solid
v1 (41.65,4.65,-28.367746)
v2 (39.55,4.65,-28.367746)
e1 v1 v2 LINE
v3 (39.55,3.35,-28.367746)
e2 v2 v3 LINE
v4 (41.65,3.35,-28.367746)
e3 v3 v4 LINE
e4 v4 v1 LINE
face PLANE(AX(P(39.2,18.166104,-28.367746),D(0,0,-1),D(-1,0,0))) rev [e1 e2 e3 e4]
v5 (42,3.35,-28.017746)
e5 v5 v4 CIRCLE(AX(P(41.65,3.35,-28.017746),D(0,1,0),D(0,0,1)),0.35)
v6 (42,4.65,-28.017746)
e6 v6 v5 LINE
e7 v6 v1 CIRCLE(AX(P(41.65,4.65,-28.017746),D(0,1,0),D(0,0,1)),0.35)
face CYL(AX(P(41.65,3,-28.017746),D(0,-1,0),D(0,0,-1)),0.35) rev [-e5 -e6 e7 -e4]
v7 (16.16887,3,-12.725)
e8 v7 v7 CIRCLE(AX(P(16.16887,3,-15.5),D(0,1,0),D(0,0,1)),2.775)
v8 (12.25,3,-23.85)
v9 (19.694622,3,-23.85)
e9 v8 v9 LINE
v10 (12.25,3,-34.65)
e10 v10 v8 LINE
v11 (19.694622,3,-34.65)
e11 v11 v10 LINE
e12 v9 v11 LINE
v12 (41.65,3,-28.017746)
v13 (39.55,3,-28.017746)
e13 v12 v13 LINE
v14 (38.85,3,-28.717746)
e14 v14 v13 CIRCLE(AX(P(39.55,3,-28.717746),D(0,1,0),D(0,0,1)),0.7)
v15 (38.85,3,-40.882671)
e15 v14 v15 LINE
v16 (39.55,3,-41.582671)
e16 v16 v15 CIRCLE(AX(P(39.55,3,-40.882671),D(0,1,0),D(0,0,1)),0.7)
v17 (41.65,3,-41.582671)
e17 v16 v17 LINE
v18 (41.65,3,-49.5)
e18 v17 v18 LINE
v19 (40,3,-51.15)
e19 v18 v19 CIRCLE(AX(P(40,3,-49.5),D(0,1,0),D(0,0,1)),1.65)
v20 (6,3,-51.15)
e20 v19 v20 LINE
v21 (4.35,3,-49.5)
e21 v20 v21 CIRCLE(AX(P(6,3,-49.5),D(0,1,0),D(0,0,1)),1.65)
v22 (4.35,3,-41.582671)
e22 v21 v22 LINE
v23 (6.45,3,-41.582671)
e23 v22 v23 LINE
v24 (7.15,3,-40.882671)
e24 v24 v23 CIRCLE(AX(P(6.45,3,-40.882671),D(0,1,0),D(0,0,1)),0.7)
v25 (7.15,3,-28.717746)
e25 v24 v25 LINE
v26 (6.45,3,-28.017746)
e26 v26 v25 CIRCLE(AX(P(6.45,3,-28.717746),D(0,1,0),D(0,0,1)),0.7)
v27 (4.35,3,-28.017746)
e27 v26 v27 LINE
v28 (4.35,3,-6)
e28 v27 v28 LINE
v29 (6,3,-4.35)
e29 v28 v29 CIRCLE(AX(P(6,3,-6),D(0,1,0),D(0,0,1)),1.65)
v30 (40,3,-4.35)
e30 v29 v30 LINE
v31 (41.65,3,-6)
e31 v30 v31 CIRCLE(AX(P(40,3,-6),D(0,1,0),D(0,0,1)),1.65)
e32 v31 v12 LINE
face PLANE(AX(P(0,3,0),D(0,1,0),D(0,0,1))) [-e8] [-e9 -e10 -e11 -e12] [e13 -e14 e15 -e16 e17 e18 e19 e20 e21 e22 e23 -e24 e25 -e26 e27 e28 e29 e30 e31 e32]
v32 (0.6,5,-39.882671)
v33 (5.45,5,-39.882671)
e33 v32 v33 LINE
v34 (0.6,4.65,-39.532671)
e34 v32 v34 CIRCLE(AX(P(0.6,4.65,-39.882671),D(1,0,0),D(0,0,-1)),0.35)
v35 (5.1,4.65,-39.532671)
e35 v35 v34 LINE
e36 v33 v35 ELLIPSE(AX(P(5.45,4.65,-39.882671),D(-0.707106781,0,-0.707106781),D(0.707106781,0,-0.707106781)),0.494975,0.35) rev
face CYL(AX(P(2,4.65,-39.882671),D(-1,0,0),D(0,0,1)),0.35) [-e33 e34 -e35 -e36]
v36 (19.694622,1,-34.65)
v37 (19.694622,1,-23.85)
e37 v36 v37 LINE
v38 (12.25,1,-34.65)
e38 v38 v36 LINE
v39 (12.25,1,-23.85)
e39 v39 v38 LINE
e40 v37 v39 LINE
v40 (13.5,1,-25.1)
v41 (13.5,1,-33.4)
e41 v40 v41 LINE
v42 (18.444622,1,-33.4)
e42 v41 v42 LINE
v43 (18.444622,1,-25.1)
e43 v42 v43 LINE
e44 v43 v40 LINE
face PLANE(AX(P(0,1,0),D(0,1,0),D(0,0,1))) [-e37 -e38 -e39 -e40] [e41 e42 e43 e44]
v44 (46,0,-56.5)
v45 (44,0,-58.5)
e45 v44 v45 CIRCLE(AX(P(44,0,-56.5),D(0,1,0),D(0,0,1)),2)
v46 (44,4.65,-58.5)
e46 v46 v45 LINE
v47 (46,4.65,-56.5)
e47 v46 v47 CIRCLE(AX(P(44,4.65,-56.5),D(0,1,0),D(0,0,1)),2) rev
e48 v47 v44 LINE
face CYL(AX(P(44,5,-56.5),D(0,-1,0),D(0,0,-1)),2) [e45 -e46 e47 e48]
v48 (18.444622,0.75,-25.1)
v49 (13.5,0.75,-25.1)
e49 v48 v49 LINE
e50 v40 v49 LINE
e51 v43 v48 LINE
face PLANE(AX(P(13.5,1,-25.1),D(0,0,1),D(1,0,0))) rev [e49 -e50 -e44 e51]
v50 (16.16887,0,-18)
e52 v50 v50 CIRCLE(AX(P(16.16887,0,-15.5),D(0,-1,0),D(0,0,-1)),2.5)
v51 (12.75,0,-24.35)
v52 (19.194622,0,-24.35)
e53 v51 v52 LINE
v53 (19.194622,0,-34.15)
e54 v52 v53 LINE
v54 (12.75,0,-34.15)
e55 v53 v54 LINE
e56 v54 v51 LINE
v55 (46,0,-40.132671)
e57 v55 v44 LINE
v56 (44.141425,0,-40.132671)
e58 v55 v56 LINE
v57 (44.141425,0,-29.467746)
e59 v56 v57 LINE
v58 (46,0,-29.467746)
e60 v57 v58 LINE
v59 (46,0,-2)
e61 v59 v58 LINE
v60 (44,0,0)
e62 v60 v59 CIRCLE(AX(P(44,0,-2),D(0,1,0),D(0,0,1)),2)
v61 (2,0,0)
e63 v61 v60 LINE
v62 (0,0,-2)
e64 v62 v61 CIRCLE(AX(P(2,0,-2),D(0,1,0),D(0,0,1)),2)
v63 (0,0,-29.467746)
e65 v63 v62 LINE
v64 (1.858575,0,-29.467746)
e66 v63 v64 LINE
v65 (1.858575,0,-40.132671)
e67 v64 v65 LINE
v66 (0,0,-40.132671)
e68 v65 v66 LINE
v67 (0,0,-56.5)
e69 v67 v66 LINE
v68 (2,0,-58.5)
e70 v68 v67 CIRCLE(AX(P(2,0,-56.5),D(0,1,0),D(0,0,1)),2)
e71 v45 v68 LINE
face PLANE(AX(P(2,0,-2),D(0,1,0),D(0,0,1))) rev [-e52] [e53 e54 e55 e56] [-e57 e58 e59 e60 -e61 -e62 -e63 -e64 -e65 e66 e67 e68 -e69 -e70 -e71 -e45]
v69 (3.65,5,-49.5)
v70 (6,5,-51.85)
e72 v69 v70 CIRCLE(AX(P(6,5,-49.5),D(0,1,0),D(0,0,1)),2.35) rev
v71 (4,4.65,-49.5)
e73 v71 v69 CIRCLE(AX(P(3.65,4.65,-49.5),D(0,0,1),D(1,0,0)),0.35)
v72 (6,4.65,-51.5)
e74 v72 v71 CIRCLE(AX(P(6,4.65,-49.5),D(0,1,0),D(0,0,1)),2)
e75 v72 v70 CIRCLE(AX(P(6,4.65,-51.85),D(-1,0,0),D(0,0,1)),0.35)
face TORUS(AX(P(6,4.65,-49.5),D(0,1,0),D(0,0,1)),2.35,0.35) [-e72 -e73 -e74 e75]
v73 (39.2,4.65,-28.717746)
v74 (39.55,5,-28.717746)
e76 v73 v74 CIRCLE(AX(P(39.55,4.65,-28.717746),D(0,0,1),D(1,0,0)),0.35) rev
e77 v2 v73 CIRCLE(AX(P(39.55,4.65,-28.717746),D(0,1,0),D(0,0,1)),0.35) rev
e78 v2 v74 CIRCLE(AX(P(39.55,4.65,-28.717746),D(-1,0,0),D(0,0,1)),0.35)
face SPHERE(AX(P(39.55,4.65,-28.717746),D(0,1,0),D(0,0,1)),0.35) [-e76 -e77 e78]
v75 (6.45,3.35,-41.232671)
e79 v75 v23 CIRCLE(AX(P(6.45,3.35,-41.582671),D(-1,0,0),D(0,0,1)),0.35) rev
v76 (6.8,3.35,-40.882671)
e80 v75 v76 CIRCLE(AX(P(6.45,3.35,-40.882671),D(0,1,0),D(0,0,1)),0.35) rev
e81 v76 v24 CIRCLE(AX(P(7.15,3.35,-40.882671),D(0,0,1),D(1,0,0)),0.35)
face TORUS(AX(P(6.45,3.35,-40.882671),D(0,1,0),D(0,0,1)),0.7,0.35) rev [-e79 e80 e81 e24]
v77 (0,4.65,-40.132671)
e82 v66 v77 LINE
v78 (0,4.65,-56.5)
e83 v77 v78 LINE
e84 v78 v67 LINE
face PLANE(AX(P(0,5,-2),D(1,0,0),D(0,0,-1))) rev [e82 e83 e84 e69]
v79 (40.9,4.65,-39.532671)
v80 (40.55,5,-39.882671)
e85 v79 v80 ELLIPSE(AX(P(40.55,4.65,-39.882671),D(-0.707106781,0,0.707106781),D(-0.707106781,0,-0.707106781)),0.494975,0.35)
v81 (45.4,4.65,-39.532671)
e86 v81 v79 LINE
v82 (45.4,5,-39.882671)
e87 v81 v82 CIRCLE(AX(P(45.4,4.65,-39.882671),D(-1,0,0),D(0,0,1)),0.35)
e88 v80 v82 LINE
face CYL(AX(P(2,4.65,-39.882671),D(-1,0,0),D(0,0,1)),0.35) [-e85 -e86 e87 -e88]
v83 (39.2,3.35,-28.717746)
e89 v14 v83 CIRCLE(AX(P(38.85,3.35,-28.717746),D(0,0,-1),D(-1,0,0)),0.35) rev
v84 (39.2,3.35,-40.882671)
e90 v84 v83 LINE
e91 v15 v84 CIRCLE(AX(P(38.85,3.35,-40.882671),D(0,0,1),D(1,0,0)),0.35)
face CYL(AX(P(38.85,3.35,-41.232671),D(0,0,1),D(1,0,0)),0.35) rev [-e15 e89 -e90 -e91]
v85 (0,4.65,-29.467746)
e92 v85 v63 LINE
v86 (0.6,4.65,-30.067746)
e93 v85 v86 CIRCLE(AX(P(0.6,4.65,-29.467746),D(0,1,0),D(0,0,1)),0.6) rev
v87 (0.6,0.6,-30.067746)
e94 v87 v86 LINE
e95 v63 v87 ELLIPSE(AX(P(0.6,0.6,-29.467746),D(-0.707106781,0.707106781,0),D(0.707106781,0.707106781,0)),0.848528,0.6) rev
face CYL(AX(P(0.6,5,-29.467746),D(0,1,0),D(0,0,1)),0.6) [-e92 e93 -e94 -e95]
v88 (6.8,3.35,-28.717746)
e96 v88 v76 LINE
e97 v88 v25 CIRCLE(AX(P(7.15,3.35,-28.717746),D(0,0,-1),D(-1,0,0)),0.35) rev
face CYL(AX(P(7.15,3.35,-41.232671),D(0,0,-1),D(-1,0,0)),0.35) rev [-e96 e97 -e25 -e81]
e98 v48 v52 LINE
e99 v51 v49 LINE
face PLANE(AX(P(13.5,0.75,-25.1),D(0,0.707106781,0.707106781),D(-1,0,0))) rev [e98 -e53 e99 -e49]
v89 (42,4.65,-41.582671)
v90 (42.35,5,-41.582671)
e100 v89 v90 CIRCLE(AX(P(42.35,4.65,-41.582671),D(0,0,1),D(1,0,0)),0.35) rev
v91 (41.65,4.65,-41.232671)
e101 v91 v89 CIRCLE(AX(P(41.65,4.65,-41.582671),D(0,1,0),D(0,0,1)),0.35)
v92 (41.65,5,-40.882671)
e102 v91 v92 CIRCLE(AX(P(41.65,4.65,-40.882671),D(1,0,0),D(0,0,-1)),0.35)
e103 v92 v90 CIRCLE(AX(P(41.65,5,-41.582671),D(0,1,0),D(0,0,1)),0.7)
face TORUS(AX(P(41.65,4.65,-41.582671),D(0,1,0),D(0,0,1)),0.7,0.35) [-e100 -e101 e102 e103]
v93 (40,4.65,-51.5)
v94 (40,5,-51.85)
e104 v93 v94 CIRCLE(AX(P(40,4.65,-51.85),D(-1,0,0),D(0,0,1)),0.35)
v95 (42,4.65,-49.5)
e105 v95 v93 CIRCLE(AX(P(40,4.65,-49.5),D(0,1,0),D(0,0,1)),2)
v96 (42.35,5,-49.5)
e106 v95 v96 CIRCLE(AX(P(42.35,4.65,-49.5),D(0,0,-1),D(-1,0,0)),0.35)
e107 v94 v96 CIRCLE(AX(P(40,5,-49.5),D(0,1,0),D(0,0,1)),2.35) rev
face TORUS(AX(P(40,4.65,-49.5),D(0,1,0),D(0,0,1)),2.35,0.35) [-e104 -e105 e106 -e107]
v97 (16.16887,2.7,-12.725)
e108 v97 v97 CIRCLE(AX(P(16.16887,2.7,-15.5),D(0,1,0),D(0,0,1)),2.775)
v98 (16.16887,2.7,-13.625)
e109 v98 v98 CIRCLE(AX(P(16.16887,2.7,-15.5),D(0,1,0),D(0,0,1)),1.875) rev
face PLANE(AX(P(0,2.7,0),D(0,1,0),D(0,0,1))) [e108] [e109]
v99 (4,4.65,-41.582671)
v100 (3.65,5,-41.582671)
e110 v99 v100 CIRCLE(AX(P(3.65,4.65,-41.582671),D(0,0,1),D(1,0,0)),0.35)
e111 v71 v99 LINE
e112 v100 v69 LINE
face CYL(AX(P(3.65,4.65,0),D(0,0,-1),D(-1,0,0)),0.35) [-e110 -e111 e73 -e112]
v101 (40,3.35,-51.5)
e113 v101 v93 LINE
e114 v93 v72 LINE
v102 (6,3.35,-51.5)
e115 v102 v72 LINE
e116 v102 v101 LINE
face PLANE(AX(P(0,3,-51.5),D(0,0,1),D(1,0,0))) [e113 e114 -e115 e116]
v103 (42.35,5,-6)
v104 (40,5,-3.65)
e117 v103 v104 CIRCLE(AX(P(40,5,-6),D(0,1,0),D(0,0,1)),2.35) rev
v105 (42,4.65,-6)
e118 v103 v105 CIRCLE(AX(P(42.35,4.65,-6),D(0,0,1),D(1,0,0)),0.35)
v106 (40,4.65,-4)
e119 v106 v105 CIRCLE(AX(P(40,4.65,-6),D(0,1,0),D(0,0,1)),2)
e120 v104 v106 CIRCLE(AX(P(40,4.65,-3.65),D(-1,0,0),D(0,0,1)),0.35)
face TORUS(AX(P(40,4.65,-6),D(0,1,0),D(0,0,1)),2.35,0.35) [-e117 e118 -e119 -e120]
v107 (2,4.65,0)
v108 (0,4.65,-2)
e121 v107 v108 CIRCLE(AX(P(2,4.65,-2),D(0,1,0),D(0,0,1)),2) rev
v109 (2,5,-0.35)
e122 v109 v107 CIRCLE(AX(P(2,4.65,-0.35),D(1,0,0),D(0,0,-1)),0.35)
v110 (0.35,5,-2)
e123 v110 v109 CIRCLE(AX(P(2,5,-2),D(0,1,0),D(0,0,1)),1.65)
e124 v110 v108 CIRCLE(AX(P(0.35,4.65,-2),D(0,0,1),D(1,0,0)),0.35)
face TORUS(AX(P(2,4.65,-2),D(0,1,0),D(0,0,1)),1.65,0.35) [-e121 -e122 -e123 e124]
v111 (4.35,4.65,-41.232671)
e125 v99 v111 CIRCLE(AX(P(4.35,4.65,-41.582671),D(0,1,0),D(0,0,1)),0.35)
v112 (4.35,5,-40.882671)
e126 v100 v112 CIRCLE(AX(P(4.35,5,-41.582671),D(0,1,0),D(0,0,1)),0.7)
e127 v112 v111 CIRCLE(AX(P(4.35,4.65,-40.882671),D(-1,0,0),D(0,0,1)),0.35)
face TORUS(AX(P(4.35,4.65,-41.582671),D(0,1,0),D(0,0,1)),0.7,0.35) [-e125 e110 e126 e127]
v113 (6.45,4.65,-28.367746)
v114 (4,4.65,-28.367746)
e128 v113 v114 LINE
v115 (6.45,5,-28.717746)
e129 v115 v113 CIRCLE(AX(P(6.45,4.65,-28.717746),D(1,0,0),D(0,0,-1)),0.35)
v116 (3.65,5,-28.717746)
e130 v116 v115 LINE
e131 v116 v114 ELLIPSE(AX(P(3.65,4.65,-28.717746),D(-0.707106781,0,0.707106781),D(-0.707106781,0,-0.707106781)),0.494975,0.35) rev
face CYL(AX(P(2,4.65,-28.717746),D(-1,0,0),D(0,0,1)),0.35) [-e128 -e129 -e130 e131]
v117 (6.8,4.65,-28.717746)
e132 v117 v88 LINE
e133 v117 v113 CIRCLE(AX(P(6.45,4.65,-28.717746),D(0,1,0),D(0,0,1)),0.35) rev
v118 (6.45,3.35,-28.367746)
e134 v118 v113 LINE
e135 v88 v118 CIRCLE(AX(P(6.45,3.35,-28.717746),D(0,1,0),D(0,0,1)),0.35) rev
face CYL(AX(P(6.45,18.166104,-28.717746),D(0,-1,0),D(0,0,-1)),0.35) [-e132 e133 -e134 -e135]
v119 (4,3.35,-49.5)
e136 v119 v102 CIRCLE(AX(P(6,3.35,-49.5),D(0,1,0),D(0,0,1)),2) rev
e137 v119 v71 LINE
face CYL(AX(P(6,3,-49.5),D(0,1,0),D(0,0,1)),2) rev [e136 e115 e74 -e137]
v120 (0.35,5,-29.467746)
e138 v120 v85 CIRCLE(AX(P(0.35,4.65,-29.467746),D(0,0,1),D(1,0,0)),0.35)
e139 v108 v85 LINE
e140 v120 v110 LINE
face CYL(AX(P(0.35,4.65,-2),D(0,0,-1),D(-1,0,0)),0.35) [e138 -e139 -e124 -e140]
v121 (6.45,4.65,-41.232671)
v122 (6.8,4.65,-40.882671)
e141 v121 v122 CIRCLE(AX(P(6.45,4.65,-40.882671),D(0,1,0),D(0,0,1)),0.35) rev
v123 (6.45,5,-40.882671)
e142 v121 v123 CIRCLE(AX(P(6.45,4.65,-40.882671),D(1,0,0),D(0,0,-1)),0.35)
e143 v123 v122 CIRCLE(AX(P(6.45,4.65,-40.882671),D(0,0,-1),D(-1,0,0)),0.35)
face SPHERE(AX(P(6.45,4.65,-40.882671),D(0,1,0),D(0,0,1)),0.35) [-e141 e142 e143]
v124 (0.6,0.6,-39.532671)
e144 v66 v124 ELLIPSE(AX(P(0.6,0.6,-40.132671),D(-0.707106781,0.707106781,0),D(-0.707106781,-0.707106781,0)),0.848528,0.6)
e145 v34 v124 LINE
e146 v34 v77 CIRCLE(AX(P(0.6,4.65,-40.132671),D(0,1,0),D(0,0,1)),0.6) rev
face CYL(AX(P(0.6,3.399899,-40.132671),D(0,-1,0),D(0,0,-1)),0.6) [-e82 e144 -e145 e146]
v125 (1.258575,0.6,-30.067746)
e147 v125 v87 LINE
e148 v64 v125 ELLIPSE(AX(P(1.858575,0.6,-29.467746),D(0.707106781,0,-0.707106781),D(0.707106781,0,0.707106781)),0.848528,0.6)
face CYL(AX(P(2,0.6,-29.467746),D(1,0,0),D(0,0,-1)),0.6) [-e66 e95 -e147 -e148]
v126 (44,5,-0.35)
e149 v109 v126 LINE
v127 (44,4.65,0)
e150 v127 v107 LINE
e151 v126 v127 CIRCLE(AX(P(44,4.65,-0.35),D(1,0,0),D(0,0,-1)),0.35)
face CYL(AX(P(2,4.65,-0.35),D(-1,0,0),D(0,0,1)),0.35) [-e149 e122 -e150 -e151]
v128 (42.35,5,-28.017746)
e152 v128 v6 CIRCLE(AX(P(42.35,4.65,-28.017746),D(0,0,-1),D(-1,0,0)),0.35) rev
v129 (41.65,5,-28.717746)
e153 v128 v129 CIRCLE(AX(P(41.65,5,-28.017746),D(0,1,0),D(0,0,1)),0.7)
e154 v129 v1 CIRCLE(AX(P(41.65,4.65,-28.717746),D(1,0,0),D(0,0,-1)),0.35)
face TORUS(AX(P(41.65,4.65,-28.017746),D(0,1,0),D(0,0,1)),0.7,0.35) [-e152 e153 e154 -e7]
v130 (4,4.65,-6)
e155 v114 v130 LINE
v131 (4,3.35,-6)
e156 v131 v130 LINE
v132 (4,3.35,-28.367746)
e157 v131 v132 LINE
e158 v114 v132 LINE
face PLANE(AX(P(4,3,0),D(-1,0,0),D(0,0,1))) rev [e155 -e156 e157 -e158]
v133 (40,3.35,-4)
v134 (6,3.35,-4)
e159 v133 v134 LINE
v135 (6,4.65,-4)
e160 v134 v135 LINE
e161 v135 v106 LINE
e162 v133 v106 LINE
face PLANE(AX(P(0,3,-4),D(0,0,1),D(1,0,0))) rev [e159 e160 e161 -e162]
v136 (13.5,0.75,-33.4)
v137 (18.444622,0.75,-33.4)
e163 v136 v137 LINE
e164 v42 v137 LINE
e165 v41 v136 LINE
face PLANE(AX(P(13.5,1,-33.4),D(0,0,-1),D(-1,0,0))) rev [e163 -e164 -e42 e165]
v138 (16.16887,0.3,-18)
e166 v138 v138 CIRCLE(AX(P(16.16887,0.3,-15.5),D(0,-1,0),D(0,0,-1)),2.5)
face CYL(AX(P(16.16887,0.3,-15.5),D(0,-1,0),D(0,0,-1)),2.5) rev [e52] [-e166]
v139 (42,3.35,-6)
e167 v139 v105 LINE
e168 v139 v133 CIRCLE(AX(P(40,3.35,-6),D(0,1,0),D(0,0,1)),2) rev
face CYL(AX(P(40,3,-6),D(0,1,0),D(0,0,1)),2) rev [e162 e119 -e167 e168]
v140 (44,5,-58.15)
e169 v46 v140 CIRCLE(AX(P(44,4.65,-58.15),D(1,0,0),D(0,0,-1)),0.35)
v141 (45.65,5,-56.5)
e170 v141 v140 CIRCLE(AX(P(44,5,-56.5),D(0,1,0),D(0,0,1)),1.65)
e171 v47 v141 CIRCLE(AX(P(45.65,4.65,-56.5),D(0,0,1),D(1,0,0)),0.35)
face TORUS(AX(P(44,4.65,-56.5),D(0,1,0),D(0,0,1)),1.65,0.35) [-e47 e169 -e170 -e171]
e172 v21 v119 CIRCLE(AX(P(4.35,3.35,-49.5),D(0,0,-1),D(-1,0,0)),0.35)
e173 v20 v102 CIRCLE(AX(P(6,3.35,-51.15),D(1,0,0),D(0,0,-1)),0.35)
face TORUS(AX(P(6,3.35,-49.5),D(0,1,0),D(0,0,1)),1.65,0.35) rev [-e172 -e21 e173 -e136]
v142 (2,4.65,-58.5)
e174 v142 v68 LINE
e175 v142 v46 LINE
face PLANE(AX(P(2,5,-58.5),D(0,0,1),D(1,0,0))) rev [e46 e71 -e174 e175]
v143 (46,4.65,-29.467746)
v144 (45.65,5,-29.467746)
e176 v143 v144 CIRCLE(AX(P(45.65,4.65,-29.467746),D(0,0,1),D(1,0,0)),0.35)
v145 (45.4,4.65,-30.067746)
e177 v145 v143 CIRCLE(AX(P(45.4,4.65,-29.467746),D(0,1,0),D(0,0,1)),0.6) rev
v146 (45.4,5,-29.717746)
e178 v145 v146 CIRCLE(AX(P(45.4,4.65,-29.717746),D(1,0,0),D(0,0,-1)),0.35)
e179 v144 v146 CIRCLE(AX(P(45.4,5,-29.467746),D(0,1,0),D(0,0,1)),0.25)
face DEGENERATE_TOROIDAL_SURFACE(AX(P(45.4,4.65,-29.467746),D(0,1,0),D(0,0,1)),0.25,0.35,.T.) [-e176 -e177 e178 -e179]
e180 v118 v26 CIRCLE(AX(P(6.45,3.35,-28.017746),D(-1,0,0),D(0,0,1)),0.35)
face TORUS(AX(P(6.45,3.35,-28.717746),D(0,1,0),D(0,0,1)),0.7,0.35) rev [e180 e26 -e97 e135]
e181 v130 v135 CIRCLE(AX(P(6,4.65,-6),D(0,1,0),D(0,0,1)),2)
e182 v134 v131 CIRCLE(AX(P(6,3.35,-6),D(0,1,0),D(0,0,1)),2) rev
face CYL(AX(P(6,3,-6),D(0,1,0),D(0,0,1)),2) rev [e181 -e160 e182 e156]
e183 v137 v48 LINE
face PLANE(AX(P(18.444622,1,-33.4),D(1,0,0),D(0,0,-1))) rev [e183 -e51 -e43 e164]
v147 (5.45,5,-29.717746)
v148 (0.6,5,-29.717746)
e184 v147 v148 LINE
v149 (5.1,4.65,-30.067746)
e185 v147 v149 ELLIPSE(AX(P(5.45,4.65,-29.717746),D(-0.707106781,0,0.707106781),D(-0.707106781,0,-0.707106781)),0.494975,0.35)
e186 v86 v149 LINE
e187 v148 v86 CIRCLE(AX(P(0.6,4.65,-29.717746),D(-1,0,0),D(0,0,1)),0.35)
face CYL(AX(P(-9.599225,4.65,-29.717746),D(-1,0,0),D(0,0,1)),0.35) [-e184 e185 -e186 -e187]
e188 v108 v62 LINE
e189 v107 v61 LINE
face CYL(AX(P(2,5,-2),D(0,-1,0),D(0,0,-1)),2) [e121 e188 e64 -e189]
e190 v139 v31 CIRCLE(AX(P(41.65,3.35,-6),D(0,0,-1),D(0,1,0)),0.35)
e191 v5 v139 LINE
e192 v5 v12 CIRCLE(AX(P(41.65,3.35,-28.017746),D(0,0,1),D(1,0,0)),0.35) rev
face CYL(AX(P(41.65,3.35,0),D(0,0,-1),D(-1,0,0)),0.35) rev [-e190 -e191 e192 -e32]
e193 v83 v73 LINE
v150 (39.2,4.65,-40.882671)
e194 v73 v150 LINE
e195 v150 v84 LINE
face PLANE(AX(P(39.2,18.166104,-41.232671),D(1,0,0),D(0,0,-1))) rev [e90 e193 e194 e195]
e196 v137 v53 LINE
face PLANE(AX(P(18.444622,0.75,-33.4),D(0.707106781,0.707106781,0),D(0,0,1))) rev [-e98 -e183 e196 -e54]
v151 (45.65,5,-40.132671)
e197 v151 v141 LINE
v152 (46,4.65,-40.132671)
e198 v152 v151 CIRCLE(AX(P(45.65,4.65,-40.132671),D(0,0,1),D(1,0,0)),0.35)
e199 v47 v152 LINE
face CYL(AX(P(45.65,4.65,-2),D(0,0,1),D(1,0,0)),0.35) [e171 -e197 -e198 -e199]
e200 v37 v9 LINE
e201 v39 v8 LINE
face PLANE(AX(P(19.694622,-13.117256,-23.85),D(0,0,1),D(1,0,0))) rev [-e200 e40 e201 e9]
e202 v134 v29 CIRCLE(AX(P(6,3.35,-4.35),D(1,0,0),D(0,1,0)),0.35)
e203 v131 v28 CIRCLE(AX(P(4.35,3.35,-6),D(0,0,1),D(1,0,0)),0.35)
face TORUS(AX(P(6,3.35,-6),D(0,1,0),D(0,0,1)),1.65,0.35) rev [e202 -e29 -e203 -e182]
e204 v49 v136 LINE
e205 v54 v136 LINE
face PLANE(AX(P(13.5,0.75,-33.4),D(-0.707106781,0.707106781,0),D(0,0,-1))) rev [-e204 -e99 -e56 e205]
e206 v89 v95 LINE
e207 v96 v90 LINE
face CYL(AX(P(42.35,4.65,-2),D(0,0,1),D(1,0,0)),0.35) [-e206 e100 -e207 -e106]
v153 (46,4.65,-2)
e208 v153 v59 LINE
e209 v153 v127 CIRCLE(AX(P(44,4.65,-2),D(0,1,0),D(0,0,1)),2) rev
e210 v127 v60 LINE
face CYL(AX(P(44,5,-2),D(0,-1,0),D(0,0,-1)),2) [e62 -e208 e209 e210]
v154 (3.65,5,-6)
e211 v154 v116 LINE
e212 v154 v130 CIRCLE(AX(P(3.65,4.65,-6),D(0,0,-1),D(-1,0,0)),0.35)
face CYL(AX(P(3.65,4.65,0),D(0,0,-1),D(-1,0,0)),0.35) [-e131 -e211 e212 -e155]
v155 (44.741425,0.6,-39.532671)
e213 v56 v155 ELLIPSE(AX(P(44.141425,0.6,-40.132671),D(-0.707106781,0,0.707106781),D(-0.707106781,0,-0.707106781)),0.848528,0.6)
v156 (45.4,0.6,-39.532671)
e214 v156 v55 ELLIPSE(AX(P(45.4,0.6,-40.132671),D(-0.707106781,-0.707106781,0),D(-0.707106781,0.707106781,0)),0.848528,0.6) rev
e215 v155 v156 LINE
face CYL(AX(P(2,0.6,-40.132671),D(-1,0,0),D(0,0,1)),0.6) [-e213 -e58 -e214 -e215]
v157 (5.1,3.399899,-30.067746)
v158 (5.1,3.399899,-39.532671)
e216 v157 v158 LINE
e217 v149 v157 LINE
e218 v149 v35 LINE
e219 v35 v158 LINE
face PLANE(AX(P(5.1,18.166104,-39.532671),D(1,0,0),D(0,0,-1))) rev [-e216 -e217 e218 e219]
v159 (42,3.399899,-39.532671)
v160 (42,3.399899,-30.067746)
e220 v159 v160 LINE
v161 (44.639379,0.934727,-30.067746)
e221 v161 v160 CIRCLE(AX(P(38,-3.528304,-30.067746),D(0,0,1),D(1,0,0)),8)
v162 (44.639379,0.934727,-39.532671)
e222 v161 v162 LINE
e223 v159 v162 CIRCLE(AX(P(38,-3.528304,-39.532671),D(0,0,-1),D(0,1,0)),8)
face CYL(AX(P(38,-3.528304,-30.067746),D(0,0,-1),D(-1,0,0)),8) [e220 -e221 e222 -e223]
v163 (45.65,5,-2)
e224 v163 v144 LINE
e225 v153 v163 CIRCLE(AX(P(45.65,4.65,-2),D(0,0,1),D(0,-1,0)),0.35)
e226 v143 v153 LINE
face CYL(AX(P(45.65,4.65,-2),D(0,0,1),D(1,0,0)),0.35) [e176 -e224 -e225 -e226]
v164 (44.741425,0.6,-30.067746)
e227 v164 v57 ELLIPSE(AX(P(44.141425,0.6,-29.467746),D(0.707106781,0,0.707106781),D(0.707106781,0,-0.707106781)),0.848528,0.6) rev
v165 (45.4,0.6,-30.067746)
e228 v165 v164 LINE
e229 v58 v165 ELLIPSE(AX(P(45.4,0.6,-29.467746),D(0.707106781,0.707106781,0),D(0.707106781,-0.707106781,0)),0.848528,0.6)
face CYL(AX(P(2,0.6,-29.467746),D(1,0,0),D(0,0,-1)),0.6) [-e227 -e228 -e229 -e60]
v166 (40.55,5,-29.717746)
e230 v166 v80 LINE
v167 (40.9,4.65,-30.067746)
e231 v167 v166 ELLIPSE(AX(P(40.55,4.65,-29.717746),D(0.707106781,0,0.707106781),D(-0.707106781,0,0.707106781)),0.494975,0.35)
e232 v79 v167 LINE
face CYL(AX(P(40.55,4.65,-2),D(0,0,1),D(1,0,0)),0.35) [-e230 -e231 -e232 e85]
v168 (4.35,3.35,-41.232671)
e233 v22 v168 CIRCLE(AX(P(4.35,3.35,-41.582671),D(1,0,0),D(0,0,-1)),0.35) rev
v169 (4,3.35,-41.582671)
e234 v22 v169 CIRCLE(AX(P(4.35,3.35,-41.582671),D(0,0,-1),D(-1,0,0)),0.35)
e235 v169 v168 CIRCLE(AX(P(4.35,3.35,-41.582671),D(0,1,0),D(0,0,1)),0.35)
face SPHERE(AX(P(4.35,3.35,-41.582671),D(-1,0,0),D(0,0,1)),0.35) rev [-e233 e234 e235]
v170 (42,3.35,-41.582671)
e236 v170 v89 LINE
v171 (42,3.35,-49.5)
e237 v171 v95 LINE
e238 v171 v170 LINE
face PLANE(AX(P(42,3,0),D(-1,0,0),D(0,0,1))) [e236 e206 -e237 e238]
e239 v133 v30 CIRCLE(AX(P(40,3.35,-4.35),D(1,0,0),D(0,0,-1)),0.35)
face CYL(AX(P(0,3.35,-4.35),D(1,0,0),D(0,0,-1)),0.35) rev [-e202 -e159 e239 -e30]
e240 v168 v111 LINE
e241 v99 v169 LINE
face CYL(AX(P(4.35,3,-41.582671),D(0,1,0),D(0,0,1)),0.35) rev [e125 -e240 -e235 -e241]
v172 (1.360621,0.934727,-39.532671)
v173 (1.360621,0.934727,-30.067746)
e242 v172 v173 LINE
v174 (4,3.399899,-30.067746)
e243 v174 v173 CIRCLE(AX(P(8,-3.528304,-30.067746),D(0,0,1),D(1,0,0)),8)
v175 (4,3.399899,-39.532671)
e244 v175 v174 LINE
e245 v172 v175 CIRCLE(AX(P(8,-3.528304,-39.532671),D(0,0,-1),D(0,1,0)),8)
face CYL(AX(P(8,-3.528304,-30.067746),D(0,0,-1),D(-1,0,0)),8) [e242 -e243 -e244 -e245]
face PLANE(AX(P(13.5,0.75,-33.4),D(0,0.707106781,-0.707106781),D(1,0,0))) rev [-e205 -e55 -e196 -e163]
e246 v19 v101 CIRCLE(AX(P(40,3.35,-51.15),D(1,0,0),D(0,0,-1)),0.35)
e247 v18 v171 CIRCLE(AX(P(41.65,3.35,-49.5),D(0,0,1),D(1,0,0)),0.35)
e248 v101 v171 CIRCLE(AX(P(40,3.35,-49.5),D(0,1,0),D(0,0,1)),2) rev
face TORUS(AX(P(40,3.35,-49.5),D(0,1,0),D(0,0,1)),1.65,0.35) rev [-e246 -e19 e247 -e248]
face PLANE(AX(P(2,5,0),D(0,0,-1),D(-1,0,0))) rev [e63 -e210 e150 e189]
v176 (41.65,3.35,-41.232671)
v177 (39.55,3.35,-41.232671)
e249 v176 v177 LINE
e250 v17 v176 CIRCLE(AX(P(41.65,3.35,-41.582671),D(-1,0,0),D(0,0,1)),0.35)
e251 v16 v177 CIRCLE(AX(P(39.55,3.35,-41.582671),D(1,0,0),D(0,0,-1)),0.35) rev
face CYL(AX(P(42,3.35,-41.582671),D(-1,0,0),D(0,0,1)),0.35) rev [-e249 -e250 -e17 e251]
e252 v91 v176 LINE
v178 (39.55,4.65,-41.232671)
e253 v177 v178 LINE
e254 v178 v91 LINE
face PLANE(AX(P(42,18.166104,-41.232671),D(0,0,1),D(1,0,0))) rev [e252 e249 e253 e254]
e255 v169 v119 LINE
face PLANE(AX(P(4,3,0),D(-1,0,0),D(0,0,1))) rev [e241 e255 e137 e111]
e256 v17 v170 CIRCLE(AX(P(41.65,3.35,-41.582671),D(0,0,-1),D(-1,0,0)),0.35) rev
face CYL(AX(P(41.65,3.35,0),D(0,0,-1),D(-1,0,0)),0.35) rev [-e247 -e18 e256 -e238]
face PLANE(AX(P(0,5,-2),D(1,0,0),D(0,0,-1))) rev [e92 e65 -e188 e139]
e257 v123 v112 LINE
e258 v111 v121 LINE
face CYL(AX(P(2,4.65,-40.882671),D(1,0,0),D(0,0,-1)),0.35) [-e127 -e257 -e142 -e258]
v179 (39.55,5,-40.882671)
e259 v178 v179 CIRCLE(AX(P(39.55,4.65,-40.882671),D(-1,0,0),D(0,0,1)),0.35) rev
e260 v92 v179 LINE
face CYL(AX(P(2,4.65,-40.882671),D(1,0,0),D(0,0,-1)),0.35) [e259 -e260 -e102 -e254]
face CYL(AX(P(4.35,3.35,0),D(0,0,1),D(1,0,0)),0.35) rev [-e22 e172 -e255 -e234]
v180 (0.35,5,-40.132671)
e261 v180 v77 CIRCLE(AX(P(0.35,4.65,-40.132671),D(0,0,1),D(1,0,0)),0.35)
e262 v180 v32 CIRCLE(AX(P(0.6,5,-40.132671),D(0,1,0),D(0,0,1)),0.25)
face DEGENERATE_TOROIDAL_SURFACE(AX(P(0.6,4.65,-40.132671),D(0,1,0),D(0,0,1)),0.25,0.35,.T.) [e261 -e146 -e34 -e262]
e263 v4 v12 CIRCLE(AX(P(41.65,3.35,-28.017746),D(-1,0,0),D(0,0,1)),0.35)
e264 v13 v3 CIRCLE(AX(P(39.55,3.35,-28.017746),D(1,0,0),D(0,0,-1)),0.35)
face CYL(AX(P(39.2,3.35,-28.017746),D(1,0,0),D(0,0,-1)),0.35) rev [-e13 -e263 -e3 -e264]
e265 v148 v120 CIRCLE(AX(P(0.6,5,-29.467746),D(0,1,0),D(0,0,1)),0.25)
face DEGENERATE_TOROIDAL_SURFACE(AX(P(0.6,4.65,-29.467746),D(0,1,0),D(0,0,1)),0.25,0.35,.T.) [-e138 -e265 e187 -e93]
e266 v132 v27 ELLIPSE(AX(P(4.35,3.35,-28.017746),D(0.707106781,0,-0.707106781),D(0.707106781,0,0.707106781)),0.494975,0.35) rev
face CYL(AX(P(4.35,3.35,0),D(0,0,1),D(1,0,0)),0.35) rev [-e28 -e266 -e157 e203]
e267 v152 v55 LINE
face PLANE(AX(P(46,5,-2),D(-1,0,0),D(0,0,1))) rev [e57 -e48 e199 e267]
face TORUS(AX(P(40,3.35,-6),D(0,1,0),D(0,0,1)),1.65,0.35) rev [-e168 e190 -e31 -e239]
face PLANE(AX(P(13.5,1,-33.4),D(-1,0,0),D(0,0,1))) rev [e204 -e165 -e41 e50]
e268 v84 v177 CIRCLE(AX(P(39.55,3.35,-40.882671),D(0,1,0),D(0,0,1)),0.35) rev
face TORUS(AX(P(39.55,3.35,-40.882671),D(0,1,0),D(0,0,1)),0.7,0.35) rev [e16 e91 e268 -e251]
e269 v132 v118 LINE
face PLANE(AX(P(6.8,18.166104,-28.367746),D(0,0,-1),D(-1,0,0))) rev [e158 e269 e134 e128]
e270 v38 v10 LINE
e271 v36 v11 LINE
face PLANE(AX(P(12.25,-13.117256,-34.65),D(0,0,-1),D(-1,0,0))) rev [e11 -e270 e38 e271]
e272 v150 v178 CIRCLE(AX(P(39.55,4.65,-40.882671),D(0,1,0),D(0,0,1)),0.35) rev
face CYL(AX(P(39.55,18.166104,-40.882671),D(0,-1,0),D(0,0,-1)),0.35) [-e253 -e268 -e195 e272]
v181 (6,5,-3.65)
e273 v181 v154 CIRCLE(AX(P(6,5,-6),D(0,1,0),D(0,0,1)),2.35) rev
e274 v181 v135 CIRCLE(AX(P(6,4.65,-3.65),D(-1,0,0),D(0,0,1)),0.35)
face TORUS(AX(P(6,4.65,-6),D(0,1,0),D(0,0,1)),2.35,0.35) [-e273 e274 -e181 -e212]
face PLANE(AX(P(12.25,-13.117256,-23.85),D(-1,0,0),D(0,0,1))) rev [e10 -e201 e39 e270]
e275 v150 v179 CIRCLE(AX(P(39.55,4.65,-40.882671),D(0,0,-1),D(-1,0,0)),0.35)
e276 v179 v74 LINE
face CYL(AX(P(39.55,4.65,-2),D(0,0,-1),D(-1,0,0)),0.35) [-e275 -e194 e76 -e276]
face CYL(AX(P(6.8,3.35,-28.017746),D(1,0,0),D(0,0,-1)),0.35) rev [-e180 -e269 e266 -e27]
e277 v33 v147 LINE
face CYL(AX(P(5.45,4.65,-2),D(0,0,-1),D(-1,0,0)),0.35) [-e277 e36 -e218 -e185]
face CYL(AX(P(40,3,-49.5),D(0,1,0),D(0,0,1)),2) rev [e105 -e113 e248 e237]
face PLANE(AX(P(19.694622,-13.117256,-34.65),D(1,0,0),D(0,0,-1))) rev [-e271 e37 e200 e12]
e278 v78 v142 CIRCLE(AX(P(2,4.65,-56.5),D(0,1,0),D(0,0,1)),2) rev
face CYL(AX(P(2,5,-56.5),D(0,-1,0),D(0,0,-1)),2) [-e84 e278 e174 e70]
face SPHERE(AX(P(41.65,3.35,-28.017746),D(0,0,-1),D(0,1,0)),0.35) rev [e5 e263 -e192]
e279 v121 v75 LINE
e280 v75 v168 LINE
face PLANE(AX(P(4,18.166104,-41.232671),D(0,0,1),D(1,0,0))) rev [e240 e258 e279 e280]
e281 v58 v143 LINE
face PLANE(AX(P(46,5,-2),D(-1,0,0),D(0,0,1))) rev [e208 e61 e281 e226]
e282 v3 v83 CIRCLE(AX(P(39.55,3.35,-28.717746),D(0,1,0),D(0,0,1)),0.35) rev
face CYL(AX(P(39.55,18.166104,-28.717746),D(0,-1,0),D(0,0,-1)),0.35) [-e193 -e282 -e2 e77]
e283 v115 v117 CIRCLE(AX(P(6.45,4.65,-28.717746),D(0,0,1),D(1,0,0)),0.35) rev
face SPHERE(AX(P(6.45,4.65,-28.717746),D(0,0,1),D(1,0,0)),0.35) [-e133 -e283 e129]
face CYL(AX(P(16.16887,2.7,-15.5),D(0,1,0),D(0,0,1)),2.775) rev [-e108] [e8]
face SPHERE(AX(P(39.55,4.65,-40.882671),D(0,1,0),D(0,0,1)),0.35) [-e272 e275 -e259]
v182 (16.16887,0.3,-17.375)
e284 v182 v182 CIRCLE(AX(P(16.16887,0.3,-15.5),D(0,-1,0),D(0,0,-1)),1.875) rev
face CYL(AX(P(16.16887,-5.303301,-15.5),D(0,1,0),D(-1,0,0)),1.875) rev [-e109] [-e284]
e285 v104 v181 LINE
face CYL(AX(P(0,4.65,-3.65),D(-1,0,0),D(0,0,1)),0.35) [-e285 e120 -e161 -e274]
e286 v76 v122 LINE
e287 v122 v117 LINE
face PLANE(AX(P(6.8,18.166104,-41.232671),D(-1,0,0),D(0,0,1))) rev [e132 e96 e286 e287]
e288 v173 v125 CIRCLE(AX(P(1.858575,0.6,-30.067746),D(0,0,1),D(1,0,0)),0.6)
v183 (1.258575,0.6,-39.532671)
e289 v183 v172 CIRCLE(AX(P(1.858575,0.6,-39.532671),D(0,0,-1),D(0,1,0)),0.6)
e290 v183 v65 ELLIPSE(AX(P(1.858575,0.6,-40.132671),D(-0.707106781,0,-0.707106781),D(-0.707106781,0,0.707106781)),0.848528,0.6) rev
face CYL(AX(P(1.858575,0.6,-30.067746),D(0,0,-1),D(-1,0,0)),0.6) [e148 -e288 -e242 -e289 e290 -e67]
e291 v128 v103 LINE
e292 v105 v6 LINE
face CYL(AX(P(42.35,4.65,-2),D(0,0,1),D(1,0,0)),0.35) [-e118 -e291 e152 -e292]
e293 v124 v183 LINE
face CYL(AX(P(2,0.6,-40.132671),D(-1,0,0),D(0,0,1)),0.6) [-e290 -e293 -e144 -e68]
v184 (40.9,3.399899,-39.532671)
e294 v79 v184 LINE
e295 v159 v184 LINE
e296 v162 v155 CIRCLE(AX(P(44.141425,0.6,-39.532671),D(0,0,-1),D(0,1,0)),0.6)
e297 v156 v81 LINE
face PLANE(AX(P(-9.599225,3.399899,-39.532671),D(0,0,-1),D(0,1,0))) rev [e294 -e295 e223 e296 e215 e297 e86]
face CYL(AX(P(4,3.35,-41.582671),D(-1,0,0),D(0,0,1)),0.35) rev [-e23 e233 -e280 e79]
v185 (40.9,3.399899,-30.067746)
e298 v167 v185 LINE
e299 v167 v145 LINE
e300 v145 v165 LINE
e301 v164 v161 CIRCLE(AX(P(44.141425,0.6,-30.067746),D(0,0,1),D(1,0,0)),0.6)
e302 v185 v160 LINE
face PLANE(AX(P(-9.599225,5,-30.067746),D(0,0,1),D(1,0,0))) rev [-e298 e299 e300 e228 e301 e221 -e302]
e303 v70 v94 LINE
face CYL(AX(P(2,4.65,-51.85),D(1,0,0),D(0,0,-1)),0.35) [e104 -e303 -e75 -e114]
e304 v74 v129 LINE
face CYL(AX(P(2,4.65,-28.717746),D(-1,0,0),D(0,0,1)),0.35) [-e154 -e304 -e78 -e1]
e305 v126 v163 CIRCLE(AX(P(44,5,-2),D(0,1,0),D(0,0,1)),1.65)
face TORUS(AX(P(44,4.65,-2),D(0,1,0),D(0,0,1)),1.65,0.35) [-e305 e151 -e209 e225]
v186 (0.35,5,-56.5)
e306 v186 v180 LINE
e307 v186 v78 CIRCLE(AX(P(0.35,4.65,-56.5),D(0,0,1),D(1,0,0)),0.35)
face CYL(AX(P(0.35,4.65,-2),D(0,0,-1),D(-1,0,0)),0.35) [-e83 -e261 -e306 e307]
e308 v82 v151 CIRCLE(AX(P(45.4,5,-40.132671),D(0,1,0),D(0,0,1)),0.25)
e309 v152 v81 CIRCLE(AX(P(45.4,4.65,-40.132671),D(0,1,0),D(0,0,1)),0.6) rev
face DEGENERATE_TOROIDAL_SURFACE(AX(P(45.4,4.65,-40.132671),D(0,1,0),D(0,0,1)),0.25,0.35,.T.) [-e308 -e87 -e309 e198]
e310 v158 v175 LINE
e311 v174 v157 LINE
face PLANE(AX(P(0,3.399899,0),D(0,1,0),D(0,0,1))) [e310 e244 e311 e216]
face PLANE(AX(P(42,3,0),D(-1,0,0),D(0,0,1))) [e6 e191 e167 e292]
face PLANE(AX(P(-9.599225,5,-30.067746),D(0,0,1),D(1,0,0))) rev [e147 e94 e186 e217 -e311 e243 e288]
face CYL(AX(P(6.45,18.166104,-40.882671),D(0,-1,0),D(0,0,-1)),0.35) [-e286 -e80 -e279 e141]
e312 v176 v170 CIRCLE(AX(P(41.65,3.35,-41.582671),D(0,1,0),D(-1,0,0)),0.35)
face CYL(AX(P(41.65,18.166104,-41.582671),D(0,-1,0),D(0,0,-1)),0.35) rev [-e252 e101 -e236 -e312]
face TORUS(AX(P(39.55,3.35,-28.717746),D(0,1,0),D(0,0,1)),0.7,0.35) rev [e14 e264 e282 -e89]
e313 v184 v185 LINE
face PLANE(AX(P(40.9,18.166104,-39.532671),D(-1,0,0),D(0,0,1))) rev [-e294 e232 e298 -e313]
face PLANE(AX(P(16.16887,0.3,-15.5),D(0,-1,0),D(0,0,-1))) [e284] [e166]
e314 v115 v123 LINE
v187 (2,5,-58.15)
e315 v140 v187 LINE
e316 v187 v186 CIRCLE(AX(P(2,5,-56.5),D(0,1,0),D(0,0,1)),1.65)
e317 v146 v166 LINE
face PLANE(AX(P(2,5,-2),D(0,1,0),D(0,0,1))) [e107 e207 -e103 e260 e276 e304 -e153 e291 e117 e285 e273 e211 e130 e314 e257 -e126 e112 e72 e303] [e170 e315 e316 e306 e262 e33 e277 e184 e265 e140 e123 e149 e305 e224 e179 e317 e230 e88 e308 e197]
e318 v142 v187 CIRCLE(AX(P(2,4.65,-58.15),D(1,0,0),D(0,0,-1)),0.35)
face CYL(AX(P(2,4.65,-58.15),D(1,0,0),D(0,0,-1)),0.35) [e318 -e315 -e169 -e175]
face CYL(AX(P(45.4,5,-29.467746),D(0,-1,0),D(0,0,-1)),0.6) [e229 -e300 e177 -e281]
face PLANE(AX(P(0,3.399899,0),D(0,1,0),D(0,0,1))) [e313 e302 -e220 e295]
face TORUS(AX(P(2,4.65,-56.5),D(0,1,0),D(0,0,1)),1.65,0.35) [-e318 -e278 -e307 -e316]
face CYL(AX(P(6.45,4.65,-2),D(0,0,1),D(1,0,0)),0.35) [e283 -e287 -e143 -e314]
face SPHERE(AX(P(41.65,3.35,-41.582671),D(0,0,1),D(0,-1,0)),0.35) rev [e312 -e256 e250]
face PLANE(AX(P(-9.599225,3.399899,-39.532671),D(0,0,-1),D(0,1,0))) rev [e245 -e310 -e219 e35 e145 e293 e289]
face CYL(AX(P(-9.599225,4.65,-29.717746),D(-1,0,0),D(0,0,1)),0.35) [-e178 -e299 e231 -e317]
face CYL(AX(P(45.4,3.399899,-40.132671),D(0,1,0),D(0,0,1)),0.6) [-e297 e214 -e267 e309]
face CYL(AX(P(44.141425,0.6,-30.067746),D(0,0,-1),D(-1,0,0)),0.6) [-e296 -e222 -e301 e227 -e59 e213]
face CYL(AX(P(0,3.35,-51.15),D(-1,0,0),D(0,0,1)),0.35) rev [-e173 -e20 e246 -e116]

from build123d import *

# Parameters (mm, degrees)
BOSS_EXTRUDE1_DEPTH = 5
CUT_EXTRUDE1_DEPTH  = 2
CUT_EXTRUDE2_REACH  = 76.587
SKETCH3_W           = 9.464924718
SKETCH3_H           = 1.600101089
FILLET2_R           = 8
FILLET3_R           = 0.6
FILLET4_R           = 0.6
BOSS_EXTRUDE2_DEPTH = 2
FILLET5_R           = 0.35
SKETCH5_W           = 1.1
SKETCH5_H           = 9.464924718
BOSS_EXTRUDE3_DEPTH = 0.399899
SKETCH6_W           = 7.444621866
SKETCH6_H           = 10.8
CUT_EXTRUDE3_DEPTH  = 5
SKETCH7_W           = 7.444621866
SKETCH7_H           = 10.8
SKETCH7_W_2         = 4.944621866
SKETCH7_H_2         = 8.3
BOSS_EXTRUDE4_DEPTH = 1
CHAMFER1_SIZE       = 0.75
SKETCH8_R           = 1.875
CUT_EXTRUDE4_DEPTH  = 30
SKETCH10_R          = 2.775
CUT_EXTRUDE5_DEPTH  = 0.3
SKETCH11_R          = 2.5
CUT_EXTRUDE6_DEPTH  = 0.3


with BuildPart() as part:
    # Sketch1 → Boss-Extrude1 (new body)
    with BuildSketch(Plane(origin=(0, 0, 0), x_dir=(1, 0, 0), z_dir=(0, 1, 0))):
        with BuildLine():
            Line((2, 0), (44, 0))
            ThreePointArc((44, 0), (45.414213562, 0.585786438), (46, 2))
            Line((46, 2), (46, 56.5))
            ThreePointArc((46, 56.5), (45.414213562, 57.914213562), (44, 58.5))
            Line((44, 58.5), (2, 58.5))
            ThreePointArc((2, 58.5), (0.585786438, 57.914213562), (0, 56.5))
            Line((0, 56.5), (0, 2))
            ThreePointArc((0, 2), (0.585786438, 0.585786438), (2, 0))
        make_face()
    extrude(amount=BOSS_EXTRUDE1_DEPTH)

    # Sketch2 → Cut-Extrude1 (cut)
    with BuildSketch(Plane(origin=(0, 5, 0), x_dir=(1, 0, 0), z_dir=(0, 1, 0))):
        with BuildLine():
            ThreePointArc((4, 49.5), (4.585786438, 50.914213562), (6, 51.5))
            Line((6, 51.5), (40, 51.5))
            ThreePointArc((40, 51.5), (41.414213562, 50.914213562), (42, 49.5))
            Line((42, 49.5), (42, 6))
            ThreePointArc((42, 6), (41.414213562, 4.585786438), (40, 4))
            Line((40, 4), (6, 4))
            ThreePointArc((6, 4), (4.585786438, 4.585786438), (4, 6))
            Line((4, 6), (4, 49.5))
        make_face()
    extrude(amount=-CUT_EXTRUDE1_DEPTH, mode=Mode.SUBTRACT)

    # Cut-Extrude2: up to this face of the body (flat: up to its plane)
    cut_extrude2_end = Plane(part.part.faces().sort_by_distance((0, 2.5, -29.25))[0])
    # Sketch3 → Cut-Extrude2 (cut, up to the picked face)
    with BuildSketch(Plane(origin=(46, 0, 0), x_dir=(0, 0, -1), z_dir=(1, 0, 0)), mode=Mode.PRIVATE) as cut_extrude2_sk1:
        with Locations((34.800208847, 4.199949456)):
            Rectangle(SKETCH3_W, SKETCH3_H)
    cut_extrude2_tool1 = split(extrude(cut_extrude2_sk1.sketch, amount=-CUT_EXTRUDE2_REACH, mode=Mode.PRIVATE), bisect_by=cut_extrude2_end, keep=Keep.BOTH, mode=Mode.PRIVATE)
    add(cut_extrude2_tool1.solids().sort_by(Axis((46, 4.199949, -34.800209), (-1, 0, 0)))[0], mode=Mode.SUBTRACT)

    # Fillet2
    # the kernel refuses this fillet: 8 mm, written as the material it takes off along each edge
    with BuildSketch(Plane(origin=(46, 3.399898911, -30.067746488), x_dir=(0, -1, 0), z_dir=(0, 0, -1))) as fillet2_piece_1:
        with BuildLine():
            CenterArc((6.92820323, 8), FILLET2_R, 210, 60)
            Line((0, 4), (0, 0))
            Line((0, 0), (6.92820323, 0))
        make_face()
    extrude(amount=9.464924718, mode=Mode.SUBTRACT)
    with BuildSketch(Plane(origin=(0, 3.399898911, -30.067746488), x_dir=(0, -1, 0), z_dir=(0, 0, -1))) as fillet2_piece_2:
        with BuildLine():
            CenterArc((6.92820323, -8), FILLET2_R, 90, 60)
            Line((0, -4), (0, 0))
            Line((0, 0), (6.92820323, 0))
        make_face()
    extrude(amount=9.464924718, mode=Mode.SUBTRACT)

    # Fillet3
    fillet3_edges = [part.edges().sort_by_distance(p)[0] for p in [
        (45.179907286, 0, -34.800208847),
        (0.820092714, 0, -34.800208847),
    ]]
    fillet(fillet3_edges, radius=FILLET3_R)

    # Fillet4
    fillet4_edges = [part.edges().sort_by_distance(p)[0] for p in [
        (46, 2.5, -30.067746488),
        (46, 2.5, -39.532671206),
        (0, 2.5, -39.532671206),
        (0, 2.5, -30.067746488),
        (45.070712598, 0, -30.067746488),
        (45.070712598, 0, -39.532671206),
        (0.929287402, 0, -39.532671206),
        (0.929287402, 0, -30.067746488),
    ]]
    fillet(fillet4_edges, radius=FILLET4_R)

    # Sketch4 → Boss-Extrude2 (add)
    with BuildSketch(Plane(origin=(0, 3, 0), x_dir=(1, 0, 0), z_dir=(0, 1, 0))):
        Polygon((4, 39.532671206), (5.1, 39.532671206), (5.1, 30.067746488), (4, 30.067746488), (4, 28.367746488), (6.8, 28.367746488), (6.8, 41.232671206), (4, 41.232671206), align=None)
        Polygon((40.9, 30.067746488), (42, 30.067746488), (42, 28.367746488), (39.2, 28.367746488), (39.2, 41.232671206), (42, 41.232671206), (42, 39.532671206), (40.9, 39.532671206), align=None)
    extrude(amount=BOSS_EXTRUDE2_DEPTH)

    # Fillet5
    fillet5_edges = [part.edges().sort_by_distance(p)[0] for p in [
        (45.414213562, 5, -0.585786438),
        (46, 5, -15.733873244),
        (46, 5, -48.316335603),
        (2.85, 5, -39.532671206),
        (0.175735931, 5, -39.708407137),
        (45.824264069, 5, -39.708407137),
        (2.85, 5, -30.067746488),
        (0, 5, -15.733873244),
        (0.175735931, 5, -29.892010557),
        (45.824264069, 5, -29.892010557),
        (45.414213562, 5, -57.914213562),
        (4, 3, -17.183873244),
        (4, 5, -17.183873244),
        (4, 4, -41.232671206),
        (5.4, 3, -28.367746488),
        (6.8, 4, -28.367746488),
        (6.8, 3, -34.800208847),
        (6.8, 4, -41.232671206),
        (5.4, 3, -41.232671206),
        (5.4, 5, -41.232671206),
        (5.1, 5, -34.800208847),
        (5.4, 5, -28.367746488),
        (6.8, 5, -34.800208847),
        (23, 5, -58.5),
        (42, 3, -17.183873244),
        (42, 5, -17.183873244),
        (42, 4, -41.232671206),
        (40.6, 3, -41.232671206),
        (39.2, 4, -41.232671206),
        (39.2, 3, -34.800208847),
        (39.2, 4, -28.367746488),
        (40.6, 3, -28.367746488),
        (42, 4, -28.367746488),
        (40.9, 5, -34.800208847),
        (40.6, 5, -41.232671206),
        (39.2, 5, -34.800208847),
        (40.6, 5, -28.367746488),
        (0.585786438, 5, -57.914213562),
        (4.585786438, 5, -50.914213562),
        (23, 5, -51.5),
        (41.414213562, 3, -50.914213562),
        (42, 5, -45.366335603),
        (41.414213562, 5, -4.585786438),
        (23, 3, -4),
        (4.585786438, 5, -4.585786438),
        (4, 3, -45.366335603),
        (4.585786438, 3, -50.914213562),
        (23, 3, -51.5),
        (42, 3, -45.366335603),
        (0, 5, -48.316335603),
        (41.414213562, 3, -4.585786438),
        (4.585786438, 3, -4.585786438),
        (4, 5, -45.366335603),
        (23, 5, -4),
        (41.414213562, 5, -50.914213562),
        (0.585786438, 5, -0.585786438),
        (43.15, 5, -30.067746488),
        (43.15, 5, -39.532671206),
        (23, 5, 0),
    ]]
    fillet(fillet5_edges, radius=FILLET5_R)

    # Sketch5 → Boss-Extrude3 (add)
    with BuildSketch(Plane(origin=(0, 3, 0), x_dir=(1, 0, 0), z_dir=(0, 1, 0))):
        with Locations((4.55, 34.800208847)):
            Rectangle(SKETCH5_W, SKETCH5_H)
        with Locations((41.45, 34.800208847)):
            Rectangle(SKETCH5_W, SKETCH5_H)
    extrude(amount=BOSS_EXTRUDE3_DEPTH)

    # Sketch6 → Cut-Extrude3 (cut)
    with BuildSketch(Plane(origin=(0, 5, 0), x_dir=(1, 0, 0), z_dir=(0, 1, 0))):
        with Locations((15.972310933, 29.25)):
            Rectangle(SKETCH6_W, SKETCH6_H)
    extrude(amount=-CUT_EXTRUDE3_DEPTH, mode=Mode.SUBTRACT)

    # Sketch7 → Boss-Extrude4 (add)
    with BuildSketch(Plane.XZ):
        with Locations((15.972310933, -29.25)):
            Rectangle(SKETCH7_W, SKETCH7_H)
        with Locations((15.972310933, -29.25)):
            Rectangle(SKETCH7_W_2, SKETCH7_H_2, mode=Mode.SUBTRACT)
    extrude(amount=-BOSS_EXTRUDE4_DEPTH)

    # Chamfer1
    chamfer1_edges = [part.edges().sort_by_distance(p)[0] for p in [
        (15.972310933, 0, -33.4),
        (13.5, 0, -29.25),
        (15.972310933, 0, -25.1),
        (18.444621866, 0, -29.25),
    ]]
    chamfer(chamfer1_edges, length=CHAMFER1_SIZE)

    # Sketch8 → Cut-Extrude4 (cut)
    with BuildSketch(Plane(origin=(0, 30, 0), x_dir=(1, 0, 0), z_dir=(0, 1, 0))):
        with Locations(Location((16.168869593, 15.5, 0), (0, 0, 270))):
            Circle(SKETCH8_R)
    extrude(amount=-CUT_EXTRUDE4_DEPTH, mode=Mode.SUBTRACT)

    # Sketch10 → Cut-Extrude5 (cut)
    with BuildSketch(Plane(origin=(0, 3, 0), x_dir=(1, 0, 0), z_dir=(0, 1, 0))):
        with Locations(Location((16.168869593, 15.5, 0), (0, 0, 270))):
            Circle(SKETCH10_R)
    extrude(amount=-CUT_EXTRUDE5_DEPTH, mode=Mode.SUBTRACT)

    # Sketch11 → Cut-Extrude6 (cut)
    with BuildSketch(Plane.XZ):
        with Locations(Location((16.168869593, -15.5, 0), (0, 0, 270))):
            Circle(SKETCH11_R)
    extrude(amount=-CUT_EXTRUDE6_DEPTH, mode=Mode.SUBTRACT)


solid = part.part
